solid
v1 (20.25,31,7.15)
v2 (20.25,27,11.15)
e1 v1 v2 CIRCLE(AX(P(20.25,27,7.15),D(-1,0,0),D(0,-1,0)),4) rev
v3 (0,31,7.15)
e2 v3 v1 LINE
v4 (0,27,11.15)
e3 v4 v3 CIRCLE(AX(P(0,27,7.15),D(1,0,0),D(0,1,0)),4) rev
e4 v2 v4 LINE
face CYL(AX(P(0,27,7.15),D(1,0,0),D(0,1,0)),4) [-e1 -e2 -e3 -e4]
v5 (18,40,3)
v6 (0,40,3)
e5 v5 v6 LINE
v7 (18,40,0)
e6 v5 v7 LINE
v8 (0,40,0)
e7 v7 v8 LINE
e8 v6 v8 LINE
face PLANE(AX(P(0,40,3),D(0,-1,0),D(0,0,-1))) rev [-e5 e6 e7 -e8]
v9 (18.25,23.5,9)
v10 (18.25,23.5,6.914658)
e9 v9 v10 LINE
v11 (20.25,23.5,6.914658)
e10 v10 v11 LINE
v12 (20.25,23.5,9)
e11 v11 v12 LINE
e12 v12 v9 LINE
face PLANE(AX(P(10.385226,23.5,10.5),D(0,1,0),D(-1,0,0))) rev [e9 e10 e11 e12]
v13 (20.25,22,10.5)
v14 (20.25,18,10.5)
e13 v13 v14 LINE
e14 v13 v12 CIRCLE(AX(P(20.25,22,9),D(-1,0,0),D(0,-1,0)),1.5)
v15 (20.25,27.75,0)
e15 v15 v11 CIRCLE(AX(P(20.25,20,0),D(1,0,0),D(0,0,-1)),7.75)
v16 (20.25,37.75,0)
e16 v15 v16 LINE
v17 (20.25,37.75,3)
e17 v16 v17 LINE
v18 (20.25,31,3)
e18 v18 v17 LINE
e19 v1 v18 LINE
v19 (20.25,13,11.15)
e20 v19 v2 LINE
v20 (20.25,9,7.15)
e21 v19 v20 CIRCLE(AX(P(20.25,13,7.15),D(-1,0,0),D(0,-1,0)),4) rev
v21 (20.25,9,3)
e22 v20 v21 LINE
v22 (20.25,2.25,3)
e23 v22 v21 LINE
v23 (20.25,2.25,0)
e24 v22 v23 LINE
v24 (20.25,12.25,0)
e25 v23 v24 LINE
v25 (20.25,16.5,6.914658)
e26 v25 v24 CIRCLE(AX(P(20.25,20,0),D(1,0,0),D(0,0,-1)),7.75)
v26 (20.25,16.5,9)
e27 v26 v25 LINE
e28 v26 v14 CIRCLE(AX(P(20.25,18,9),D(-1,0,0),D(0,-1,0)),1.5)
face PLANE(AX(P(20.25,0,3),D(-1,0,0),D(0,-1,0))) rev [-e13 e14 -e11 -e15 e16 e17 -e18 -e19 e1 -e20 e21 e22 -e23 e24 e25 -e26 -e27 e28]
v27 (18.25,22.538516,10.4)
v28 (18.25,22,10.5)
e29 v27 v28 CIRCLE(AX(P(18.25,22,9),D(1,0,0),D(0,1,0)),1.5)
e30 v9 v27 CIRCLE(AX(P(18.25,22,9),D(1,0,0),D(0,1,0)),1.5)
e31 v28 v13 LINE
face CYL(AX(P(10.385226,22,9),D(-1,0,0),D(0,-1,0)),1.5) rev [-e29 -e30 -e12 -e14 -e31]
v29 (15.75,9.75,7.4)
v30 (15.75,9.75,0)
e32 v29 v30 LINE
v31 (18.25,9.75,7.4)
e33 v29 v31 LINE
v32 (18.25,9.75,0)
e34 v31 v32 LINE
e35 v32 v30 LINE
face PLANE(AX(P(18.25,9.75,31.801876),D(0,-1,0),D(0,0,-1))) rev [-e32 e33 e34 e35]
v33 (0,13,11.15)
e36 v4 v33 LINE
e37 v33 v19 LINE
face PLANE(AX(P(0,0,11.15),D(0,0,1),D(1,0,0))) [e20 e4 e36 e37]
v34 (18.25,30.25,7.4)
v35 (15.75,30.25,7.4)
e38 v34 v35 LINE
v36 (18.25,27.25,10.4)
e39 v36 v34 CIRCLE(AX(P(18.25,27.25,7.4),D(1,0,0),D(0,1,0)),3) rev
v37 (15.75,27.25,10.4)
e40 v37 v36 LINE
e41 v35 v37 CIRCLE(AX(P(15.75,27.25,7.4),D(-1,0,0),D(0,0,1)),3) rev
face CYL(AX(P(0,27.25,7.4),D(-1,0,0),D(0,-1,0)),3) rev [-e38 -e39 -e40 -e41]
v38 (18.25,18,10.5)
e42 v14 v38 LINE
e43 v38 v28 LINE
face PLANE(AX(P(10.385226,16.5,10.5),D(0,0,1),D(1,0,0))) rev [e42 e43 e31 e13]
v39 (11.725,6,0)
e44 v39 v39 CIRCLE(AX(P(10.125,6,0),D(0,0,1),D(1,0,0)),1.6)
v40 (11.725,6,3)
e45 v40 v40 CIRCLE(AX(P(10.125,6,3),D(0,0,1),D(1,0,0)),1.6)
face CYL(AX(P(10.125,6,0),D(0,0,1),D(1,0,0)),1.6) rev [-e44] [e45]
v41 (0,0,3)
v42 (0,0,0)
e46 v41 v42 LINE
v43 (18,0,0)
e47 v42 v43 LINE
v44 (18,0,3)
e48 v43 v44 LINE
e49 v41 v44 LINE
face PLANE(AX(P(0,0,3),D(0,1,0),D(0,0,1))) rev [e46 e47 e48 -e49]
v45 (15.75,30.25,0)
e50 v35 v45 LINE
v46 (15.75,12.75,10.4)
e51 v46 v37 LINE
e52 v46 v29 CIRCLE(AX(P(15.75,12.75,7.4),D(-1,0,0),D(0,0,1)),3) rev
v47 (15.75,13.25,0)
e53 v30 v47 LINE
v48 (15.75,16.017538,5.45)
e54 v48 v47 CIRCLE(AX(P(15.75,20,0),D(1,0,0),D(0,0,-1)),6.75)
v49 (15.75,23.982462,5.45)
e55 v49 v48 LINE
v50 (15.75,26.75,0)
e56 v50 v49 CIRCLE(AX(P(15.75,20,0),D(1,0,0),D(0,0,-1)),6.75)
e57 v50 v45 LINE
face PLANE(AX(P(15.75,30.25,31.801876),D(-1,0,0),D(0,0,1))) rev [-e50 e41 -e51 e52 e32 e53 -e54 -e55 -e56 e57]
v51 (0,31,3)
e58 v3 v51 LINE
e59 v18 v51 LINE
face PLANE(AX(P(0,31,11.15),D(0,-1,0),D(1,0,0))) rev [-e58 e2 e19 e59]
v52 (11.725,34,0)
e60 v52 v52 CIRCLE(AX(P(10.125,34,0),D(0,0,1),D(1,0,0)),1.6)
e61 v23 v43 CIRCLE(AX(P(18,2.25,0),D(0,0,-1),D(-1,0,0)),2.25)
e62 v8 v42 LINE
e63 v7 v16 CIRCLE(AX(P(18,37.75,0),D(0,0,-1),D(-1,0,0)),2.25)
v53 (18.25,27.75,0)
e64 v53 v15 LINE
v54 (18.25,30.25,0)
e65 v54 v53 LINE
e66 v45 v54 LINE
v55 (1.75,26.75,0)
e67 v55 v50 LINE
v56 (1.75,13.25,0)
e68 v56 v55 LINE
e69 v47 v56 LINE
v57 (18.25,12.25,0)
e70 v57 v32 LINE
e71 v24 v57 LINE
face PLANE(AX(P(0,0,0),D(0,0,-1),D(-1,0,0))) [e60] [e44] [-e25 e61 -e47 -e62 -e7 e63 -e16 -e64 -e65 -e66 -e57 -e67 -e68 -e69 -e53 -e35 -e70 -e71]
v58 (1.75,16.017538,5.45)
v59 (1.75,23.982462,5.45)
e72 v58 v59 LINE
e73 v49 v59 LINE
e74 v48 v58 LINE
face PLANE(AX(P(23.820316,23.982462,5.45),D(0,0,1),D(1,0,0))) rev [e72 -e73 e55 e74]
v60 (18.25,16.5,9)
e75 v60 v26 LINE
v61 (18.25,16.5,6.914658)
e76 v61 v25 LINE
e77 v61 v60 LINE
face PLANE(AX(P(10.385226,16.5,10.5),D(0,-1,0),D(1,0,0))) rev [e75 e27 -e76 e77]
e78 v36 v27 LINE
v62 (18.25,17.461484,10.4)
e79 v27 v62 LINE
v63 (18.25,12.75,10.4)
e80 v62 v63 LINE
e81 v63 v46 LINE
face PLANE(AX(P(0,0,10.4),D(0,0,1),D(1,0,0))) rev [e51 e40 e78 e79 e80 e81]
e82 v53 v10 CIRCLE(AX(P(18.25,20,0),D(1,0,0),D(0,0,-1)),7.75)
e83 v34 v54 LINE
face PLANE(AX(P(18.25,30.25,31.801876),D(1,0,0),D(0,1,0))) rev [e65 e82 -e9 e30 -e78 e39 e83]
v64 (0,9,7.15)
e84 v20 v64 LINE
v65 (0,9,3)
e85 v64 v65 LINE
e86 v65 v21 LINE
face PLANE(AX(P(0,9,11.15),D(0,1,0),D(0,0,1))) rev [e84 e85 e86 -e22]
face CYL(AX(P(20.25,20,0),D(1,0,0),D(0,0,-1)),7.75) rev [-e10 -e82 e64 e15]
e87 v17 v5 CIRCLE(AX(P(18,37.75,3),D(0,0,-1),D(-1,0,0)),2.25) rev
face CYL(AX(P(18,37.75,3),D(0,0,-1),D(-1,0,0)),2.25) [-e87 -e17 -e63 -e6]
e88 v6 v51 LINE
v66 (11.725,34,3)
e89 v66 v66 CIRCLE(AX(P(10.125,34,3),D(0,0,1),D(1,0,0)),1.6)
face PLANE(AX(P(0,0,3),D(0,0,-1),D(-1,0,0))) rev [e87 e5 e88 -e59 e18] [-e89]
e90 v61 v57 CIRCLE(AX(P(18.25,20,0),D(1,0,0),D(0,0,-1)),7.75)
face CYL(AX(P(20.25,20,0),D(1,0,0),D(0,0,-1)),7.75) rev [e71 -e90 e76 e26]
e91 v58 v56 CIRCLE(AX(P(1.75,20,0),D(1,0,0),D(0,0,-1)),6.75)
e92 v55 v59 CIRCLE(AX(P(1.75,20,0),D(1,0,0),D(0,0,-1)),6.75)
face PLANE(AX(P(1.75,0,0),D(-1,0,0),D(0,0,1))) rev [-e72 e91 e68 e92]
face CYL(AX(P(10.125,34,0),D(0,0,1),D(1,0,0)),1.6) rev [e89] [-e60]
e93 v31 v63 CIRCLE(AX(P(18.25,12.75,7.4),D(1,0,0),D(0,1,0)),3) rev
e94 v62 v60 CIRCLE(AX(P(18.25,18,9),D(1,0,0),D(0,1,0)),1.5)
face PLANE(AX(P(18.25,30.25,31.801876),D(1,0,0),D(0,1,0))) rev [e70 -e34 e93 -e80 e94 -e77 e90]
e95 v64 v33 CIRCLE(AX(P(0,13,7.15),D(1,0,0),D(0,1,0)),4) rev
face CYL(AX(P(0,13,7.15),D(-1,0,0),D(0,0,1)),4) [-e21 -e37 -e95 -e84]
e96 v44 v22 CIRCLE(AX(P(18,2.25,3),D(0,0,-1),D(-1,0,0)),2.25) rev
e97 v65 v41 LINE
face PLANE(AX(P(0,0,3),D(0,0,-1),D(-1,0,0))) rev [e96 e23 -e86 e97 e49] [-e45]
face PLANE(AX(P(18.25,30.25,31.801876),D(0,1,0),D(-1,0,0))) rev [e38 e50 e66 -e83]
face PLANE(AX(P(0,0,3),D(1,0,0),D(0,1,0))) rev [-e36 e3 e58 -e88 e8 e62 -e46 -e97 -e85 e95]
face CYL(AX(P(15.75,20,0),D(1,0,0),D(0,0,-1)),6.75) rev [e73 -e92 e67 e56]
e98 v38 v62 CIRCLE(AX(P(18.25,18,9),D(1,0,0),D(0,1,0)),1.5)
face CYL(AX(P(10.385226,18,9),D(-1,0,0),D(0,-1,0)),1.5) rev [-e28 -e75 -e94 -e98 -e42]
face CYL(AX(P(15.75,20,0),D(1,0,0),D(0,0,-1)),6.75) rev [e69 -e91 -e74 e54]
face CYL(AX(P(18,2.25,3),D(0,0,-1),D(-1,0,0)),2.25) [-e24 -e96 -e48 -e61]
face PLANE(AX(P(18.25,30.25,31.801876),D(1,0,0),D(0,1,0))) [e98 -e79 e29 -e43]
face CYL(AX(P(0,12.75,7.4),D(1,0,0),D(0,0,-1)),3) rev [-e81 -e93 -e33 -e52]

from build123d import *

# Parameters (mm, degrees)
SKETCH1_W           = 20.25
SKETCH1_H           = 40
BODY_DEPTH          = 3
SKETCH2_W           = 20.25
SKETCH2_H           = 22
HIROSE_DEPTH        = 8.15
SKETCH3_W           = 2
SKETCH3_H           = 7.75
SKETCH4_W           = 2.5
SKETCH4_H           = 20.5
HIROSE_MID_DEPTH    = 10.4
CUT_EXTRUDE2_DEPTH  = 2
FILLET1_R           = 1.5
SKETCH7_W           = 14
SKETCH7_H           = 6.75
BOSS_EXTRUDE3_START = 14
BOSS_EXTRUDE3_DEPTH = 14
FILLET2_R           = 3
FILLET3_R           = 4
SKETCH9_R           = 1.6
CUT_EXTRUDE3_DEPTH  = 46.568464973
FILLET4_R           = 2.25


with BuildPart() as part:
    # Sketch1 → body (new body)
    with BuildSketch(Plane.XY):
        with Locations((10.125, 20)):
            Rectangle(SKETCH1_W, SKETCH1_H)
    extrude(amount=BODY_DEPTH)

    # Sketch2 → hirose (add)
    with BuildSketch(Plane.XY.offset(3)):
        with Locations((10.125, 20)):
            Rectangle(SKETCH2_W, SKETCH2_H)
    extrude(amount=HIROSE_DEPTH)

    # Sketch3 → hirose-front (revolve, cut)
    with BuildSketch(Plane(origin=(0, 0, 0), x_dir=(-1, 0, 0), z_dir=(0, 0, -1))):
        with Locations((-19.25, 23.875)):
            Rectangle(SKETCH3_W, SKETCH3_H)
    revolve(axis=Axis((20.25, 20, 0), (-1, 0, 0)), mode=Mode.SUBTRACT)

    # Sketch4 → hirose-mid (cut)
    with BuildSketch(Plane(origin=(0, 0, 0), x_dir=(-1, 0, 0), z_dir=(0, 0, -1))):
        with Locations((-17, 20)):
            Rectangle(SKETCH4_W, SKETCH4_H)
    extrude(amount=-HIROSE_MID_DEPTH, mode=Mode.SUBTRACT)

    # Sketch5 → Cut-Extrude2 (cut)
    with BuildSketch(Plane(origin=(20.25, 0, 0), x_dir=(0, 0, -1), z_dir=(1, 0, 0))):
        with BuildLine():
            Line((-10.5, 16.5), (-10.5, 23.5))
            Line((-10.5, 23.5), (-6.914658343, 23.5))
            ThreePointArc((-6.914658343, 23.5), (-7.75, 20), (-6.914658343, 16.5))
            Line((-6.914658343, 16.5), (-10.5, 16.5))
        make_face()
    extrude(amount=-CUT_EXTRUDE2_DEPTH, mode=Mode.SUBTRACT)

    # Fillet1
    # the kernel refuses this fillet: 1.5 mm, written as the material it adds along each edge
    with BuildSketch(Plane(origin=(20.25, 23.5, 10.5), x_dir=(0, -1, 0), z_dir=(-1, 0, 0)), Plane(origin=(20.25, 16.5, 10.5), x_dir=(0, 0, -1), z_dir=(-1, 0, 0))) as fillet1_piece_1:
        with BuildLine():
            CenterArc((FILLET1_R, -FILLET1_R), FILLET1_R, 90, 90)
            Line((0, -FILLET1_R), (0, 0))
            Line((0, 0), (FILLET1_R, 0))
        make_face()
    extrude(amount=2)

    # Sketch7 → Cut-Revolve2 (revolve, cut)
    with BuildSketch(Plane(origin=(0, 0, 0), x_dir=(-1, 0, 0), z_dir=(0, 0, -1))):
        with Locations((-8.75, 23.375)):
            Rectangle(SKETCH7_W, SKETCH7_H)
    revolve(axis=Axis((15.75, 20, 0), (-1, 0, 0)), mode=Mode.SUBTRACT)

    # Sketch8 → Boss-Extrude3 (add)
    with BuildSketch(Plane(origin=(1.75, 0, 0), x_dir=(0, 0, -1), z_dir=(1, 0, 0)).offset(BOSS_EXTRUDE3_START)):
        with BuildLine():
            Line((-5.45, 23.98246155), (-5.45, 16.01753845))
            ThreePointArc((-5.45, 16.01753845), (-6.75, 20), (-5.45, 23.98246155))
        make_face()
    extrude(amount=-BOSS_EXTRUDE3_DEPTH)

    # Fillet2
    fillet2_edges = [part.edges().sort_by_distance(p)[0] for p in [
        (17, 9.75, 10.4),
        (17, 30.25, 10.4),
    ]]
    fillet(fillet2_edges, radius=FILLET2_R)

    # Fillet3
    fillet3_edges = [part.edges().sort_by_distance(p)[0] for p in [
        (10.125, 9, 11.15),
        (10.125, 31, 11.15),
    ]]
    fillet(fillet3_edges, radius=FILLET3_R)

    # Sketch9 → Cut-Extrude3 (cut, through all)
    with BuildSketch(Plane.XY.offset(3)):
        with Locations((10.125, 34)):
            Circle(SKETCH9_R)
        with Locations((10.125, 6)):
            Circle(SKETCH9_R)
    extrude(amount=-CUT_EXTRUDE3_DEPTH, mode=Mode.SUBTRACT)

    # Fillet4
    fillet4_edges = [part.edges().sort_by_distance(p)[0] for p in [
        (20.25, 40, 1.5),
        (20.25, 0, 1.5),
    ]]
    fillet(fillet4_edges, radius=FILLET4_R)


solid = part.part
